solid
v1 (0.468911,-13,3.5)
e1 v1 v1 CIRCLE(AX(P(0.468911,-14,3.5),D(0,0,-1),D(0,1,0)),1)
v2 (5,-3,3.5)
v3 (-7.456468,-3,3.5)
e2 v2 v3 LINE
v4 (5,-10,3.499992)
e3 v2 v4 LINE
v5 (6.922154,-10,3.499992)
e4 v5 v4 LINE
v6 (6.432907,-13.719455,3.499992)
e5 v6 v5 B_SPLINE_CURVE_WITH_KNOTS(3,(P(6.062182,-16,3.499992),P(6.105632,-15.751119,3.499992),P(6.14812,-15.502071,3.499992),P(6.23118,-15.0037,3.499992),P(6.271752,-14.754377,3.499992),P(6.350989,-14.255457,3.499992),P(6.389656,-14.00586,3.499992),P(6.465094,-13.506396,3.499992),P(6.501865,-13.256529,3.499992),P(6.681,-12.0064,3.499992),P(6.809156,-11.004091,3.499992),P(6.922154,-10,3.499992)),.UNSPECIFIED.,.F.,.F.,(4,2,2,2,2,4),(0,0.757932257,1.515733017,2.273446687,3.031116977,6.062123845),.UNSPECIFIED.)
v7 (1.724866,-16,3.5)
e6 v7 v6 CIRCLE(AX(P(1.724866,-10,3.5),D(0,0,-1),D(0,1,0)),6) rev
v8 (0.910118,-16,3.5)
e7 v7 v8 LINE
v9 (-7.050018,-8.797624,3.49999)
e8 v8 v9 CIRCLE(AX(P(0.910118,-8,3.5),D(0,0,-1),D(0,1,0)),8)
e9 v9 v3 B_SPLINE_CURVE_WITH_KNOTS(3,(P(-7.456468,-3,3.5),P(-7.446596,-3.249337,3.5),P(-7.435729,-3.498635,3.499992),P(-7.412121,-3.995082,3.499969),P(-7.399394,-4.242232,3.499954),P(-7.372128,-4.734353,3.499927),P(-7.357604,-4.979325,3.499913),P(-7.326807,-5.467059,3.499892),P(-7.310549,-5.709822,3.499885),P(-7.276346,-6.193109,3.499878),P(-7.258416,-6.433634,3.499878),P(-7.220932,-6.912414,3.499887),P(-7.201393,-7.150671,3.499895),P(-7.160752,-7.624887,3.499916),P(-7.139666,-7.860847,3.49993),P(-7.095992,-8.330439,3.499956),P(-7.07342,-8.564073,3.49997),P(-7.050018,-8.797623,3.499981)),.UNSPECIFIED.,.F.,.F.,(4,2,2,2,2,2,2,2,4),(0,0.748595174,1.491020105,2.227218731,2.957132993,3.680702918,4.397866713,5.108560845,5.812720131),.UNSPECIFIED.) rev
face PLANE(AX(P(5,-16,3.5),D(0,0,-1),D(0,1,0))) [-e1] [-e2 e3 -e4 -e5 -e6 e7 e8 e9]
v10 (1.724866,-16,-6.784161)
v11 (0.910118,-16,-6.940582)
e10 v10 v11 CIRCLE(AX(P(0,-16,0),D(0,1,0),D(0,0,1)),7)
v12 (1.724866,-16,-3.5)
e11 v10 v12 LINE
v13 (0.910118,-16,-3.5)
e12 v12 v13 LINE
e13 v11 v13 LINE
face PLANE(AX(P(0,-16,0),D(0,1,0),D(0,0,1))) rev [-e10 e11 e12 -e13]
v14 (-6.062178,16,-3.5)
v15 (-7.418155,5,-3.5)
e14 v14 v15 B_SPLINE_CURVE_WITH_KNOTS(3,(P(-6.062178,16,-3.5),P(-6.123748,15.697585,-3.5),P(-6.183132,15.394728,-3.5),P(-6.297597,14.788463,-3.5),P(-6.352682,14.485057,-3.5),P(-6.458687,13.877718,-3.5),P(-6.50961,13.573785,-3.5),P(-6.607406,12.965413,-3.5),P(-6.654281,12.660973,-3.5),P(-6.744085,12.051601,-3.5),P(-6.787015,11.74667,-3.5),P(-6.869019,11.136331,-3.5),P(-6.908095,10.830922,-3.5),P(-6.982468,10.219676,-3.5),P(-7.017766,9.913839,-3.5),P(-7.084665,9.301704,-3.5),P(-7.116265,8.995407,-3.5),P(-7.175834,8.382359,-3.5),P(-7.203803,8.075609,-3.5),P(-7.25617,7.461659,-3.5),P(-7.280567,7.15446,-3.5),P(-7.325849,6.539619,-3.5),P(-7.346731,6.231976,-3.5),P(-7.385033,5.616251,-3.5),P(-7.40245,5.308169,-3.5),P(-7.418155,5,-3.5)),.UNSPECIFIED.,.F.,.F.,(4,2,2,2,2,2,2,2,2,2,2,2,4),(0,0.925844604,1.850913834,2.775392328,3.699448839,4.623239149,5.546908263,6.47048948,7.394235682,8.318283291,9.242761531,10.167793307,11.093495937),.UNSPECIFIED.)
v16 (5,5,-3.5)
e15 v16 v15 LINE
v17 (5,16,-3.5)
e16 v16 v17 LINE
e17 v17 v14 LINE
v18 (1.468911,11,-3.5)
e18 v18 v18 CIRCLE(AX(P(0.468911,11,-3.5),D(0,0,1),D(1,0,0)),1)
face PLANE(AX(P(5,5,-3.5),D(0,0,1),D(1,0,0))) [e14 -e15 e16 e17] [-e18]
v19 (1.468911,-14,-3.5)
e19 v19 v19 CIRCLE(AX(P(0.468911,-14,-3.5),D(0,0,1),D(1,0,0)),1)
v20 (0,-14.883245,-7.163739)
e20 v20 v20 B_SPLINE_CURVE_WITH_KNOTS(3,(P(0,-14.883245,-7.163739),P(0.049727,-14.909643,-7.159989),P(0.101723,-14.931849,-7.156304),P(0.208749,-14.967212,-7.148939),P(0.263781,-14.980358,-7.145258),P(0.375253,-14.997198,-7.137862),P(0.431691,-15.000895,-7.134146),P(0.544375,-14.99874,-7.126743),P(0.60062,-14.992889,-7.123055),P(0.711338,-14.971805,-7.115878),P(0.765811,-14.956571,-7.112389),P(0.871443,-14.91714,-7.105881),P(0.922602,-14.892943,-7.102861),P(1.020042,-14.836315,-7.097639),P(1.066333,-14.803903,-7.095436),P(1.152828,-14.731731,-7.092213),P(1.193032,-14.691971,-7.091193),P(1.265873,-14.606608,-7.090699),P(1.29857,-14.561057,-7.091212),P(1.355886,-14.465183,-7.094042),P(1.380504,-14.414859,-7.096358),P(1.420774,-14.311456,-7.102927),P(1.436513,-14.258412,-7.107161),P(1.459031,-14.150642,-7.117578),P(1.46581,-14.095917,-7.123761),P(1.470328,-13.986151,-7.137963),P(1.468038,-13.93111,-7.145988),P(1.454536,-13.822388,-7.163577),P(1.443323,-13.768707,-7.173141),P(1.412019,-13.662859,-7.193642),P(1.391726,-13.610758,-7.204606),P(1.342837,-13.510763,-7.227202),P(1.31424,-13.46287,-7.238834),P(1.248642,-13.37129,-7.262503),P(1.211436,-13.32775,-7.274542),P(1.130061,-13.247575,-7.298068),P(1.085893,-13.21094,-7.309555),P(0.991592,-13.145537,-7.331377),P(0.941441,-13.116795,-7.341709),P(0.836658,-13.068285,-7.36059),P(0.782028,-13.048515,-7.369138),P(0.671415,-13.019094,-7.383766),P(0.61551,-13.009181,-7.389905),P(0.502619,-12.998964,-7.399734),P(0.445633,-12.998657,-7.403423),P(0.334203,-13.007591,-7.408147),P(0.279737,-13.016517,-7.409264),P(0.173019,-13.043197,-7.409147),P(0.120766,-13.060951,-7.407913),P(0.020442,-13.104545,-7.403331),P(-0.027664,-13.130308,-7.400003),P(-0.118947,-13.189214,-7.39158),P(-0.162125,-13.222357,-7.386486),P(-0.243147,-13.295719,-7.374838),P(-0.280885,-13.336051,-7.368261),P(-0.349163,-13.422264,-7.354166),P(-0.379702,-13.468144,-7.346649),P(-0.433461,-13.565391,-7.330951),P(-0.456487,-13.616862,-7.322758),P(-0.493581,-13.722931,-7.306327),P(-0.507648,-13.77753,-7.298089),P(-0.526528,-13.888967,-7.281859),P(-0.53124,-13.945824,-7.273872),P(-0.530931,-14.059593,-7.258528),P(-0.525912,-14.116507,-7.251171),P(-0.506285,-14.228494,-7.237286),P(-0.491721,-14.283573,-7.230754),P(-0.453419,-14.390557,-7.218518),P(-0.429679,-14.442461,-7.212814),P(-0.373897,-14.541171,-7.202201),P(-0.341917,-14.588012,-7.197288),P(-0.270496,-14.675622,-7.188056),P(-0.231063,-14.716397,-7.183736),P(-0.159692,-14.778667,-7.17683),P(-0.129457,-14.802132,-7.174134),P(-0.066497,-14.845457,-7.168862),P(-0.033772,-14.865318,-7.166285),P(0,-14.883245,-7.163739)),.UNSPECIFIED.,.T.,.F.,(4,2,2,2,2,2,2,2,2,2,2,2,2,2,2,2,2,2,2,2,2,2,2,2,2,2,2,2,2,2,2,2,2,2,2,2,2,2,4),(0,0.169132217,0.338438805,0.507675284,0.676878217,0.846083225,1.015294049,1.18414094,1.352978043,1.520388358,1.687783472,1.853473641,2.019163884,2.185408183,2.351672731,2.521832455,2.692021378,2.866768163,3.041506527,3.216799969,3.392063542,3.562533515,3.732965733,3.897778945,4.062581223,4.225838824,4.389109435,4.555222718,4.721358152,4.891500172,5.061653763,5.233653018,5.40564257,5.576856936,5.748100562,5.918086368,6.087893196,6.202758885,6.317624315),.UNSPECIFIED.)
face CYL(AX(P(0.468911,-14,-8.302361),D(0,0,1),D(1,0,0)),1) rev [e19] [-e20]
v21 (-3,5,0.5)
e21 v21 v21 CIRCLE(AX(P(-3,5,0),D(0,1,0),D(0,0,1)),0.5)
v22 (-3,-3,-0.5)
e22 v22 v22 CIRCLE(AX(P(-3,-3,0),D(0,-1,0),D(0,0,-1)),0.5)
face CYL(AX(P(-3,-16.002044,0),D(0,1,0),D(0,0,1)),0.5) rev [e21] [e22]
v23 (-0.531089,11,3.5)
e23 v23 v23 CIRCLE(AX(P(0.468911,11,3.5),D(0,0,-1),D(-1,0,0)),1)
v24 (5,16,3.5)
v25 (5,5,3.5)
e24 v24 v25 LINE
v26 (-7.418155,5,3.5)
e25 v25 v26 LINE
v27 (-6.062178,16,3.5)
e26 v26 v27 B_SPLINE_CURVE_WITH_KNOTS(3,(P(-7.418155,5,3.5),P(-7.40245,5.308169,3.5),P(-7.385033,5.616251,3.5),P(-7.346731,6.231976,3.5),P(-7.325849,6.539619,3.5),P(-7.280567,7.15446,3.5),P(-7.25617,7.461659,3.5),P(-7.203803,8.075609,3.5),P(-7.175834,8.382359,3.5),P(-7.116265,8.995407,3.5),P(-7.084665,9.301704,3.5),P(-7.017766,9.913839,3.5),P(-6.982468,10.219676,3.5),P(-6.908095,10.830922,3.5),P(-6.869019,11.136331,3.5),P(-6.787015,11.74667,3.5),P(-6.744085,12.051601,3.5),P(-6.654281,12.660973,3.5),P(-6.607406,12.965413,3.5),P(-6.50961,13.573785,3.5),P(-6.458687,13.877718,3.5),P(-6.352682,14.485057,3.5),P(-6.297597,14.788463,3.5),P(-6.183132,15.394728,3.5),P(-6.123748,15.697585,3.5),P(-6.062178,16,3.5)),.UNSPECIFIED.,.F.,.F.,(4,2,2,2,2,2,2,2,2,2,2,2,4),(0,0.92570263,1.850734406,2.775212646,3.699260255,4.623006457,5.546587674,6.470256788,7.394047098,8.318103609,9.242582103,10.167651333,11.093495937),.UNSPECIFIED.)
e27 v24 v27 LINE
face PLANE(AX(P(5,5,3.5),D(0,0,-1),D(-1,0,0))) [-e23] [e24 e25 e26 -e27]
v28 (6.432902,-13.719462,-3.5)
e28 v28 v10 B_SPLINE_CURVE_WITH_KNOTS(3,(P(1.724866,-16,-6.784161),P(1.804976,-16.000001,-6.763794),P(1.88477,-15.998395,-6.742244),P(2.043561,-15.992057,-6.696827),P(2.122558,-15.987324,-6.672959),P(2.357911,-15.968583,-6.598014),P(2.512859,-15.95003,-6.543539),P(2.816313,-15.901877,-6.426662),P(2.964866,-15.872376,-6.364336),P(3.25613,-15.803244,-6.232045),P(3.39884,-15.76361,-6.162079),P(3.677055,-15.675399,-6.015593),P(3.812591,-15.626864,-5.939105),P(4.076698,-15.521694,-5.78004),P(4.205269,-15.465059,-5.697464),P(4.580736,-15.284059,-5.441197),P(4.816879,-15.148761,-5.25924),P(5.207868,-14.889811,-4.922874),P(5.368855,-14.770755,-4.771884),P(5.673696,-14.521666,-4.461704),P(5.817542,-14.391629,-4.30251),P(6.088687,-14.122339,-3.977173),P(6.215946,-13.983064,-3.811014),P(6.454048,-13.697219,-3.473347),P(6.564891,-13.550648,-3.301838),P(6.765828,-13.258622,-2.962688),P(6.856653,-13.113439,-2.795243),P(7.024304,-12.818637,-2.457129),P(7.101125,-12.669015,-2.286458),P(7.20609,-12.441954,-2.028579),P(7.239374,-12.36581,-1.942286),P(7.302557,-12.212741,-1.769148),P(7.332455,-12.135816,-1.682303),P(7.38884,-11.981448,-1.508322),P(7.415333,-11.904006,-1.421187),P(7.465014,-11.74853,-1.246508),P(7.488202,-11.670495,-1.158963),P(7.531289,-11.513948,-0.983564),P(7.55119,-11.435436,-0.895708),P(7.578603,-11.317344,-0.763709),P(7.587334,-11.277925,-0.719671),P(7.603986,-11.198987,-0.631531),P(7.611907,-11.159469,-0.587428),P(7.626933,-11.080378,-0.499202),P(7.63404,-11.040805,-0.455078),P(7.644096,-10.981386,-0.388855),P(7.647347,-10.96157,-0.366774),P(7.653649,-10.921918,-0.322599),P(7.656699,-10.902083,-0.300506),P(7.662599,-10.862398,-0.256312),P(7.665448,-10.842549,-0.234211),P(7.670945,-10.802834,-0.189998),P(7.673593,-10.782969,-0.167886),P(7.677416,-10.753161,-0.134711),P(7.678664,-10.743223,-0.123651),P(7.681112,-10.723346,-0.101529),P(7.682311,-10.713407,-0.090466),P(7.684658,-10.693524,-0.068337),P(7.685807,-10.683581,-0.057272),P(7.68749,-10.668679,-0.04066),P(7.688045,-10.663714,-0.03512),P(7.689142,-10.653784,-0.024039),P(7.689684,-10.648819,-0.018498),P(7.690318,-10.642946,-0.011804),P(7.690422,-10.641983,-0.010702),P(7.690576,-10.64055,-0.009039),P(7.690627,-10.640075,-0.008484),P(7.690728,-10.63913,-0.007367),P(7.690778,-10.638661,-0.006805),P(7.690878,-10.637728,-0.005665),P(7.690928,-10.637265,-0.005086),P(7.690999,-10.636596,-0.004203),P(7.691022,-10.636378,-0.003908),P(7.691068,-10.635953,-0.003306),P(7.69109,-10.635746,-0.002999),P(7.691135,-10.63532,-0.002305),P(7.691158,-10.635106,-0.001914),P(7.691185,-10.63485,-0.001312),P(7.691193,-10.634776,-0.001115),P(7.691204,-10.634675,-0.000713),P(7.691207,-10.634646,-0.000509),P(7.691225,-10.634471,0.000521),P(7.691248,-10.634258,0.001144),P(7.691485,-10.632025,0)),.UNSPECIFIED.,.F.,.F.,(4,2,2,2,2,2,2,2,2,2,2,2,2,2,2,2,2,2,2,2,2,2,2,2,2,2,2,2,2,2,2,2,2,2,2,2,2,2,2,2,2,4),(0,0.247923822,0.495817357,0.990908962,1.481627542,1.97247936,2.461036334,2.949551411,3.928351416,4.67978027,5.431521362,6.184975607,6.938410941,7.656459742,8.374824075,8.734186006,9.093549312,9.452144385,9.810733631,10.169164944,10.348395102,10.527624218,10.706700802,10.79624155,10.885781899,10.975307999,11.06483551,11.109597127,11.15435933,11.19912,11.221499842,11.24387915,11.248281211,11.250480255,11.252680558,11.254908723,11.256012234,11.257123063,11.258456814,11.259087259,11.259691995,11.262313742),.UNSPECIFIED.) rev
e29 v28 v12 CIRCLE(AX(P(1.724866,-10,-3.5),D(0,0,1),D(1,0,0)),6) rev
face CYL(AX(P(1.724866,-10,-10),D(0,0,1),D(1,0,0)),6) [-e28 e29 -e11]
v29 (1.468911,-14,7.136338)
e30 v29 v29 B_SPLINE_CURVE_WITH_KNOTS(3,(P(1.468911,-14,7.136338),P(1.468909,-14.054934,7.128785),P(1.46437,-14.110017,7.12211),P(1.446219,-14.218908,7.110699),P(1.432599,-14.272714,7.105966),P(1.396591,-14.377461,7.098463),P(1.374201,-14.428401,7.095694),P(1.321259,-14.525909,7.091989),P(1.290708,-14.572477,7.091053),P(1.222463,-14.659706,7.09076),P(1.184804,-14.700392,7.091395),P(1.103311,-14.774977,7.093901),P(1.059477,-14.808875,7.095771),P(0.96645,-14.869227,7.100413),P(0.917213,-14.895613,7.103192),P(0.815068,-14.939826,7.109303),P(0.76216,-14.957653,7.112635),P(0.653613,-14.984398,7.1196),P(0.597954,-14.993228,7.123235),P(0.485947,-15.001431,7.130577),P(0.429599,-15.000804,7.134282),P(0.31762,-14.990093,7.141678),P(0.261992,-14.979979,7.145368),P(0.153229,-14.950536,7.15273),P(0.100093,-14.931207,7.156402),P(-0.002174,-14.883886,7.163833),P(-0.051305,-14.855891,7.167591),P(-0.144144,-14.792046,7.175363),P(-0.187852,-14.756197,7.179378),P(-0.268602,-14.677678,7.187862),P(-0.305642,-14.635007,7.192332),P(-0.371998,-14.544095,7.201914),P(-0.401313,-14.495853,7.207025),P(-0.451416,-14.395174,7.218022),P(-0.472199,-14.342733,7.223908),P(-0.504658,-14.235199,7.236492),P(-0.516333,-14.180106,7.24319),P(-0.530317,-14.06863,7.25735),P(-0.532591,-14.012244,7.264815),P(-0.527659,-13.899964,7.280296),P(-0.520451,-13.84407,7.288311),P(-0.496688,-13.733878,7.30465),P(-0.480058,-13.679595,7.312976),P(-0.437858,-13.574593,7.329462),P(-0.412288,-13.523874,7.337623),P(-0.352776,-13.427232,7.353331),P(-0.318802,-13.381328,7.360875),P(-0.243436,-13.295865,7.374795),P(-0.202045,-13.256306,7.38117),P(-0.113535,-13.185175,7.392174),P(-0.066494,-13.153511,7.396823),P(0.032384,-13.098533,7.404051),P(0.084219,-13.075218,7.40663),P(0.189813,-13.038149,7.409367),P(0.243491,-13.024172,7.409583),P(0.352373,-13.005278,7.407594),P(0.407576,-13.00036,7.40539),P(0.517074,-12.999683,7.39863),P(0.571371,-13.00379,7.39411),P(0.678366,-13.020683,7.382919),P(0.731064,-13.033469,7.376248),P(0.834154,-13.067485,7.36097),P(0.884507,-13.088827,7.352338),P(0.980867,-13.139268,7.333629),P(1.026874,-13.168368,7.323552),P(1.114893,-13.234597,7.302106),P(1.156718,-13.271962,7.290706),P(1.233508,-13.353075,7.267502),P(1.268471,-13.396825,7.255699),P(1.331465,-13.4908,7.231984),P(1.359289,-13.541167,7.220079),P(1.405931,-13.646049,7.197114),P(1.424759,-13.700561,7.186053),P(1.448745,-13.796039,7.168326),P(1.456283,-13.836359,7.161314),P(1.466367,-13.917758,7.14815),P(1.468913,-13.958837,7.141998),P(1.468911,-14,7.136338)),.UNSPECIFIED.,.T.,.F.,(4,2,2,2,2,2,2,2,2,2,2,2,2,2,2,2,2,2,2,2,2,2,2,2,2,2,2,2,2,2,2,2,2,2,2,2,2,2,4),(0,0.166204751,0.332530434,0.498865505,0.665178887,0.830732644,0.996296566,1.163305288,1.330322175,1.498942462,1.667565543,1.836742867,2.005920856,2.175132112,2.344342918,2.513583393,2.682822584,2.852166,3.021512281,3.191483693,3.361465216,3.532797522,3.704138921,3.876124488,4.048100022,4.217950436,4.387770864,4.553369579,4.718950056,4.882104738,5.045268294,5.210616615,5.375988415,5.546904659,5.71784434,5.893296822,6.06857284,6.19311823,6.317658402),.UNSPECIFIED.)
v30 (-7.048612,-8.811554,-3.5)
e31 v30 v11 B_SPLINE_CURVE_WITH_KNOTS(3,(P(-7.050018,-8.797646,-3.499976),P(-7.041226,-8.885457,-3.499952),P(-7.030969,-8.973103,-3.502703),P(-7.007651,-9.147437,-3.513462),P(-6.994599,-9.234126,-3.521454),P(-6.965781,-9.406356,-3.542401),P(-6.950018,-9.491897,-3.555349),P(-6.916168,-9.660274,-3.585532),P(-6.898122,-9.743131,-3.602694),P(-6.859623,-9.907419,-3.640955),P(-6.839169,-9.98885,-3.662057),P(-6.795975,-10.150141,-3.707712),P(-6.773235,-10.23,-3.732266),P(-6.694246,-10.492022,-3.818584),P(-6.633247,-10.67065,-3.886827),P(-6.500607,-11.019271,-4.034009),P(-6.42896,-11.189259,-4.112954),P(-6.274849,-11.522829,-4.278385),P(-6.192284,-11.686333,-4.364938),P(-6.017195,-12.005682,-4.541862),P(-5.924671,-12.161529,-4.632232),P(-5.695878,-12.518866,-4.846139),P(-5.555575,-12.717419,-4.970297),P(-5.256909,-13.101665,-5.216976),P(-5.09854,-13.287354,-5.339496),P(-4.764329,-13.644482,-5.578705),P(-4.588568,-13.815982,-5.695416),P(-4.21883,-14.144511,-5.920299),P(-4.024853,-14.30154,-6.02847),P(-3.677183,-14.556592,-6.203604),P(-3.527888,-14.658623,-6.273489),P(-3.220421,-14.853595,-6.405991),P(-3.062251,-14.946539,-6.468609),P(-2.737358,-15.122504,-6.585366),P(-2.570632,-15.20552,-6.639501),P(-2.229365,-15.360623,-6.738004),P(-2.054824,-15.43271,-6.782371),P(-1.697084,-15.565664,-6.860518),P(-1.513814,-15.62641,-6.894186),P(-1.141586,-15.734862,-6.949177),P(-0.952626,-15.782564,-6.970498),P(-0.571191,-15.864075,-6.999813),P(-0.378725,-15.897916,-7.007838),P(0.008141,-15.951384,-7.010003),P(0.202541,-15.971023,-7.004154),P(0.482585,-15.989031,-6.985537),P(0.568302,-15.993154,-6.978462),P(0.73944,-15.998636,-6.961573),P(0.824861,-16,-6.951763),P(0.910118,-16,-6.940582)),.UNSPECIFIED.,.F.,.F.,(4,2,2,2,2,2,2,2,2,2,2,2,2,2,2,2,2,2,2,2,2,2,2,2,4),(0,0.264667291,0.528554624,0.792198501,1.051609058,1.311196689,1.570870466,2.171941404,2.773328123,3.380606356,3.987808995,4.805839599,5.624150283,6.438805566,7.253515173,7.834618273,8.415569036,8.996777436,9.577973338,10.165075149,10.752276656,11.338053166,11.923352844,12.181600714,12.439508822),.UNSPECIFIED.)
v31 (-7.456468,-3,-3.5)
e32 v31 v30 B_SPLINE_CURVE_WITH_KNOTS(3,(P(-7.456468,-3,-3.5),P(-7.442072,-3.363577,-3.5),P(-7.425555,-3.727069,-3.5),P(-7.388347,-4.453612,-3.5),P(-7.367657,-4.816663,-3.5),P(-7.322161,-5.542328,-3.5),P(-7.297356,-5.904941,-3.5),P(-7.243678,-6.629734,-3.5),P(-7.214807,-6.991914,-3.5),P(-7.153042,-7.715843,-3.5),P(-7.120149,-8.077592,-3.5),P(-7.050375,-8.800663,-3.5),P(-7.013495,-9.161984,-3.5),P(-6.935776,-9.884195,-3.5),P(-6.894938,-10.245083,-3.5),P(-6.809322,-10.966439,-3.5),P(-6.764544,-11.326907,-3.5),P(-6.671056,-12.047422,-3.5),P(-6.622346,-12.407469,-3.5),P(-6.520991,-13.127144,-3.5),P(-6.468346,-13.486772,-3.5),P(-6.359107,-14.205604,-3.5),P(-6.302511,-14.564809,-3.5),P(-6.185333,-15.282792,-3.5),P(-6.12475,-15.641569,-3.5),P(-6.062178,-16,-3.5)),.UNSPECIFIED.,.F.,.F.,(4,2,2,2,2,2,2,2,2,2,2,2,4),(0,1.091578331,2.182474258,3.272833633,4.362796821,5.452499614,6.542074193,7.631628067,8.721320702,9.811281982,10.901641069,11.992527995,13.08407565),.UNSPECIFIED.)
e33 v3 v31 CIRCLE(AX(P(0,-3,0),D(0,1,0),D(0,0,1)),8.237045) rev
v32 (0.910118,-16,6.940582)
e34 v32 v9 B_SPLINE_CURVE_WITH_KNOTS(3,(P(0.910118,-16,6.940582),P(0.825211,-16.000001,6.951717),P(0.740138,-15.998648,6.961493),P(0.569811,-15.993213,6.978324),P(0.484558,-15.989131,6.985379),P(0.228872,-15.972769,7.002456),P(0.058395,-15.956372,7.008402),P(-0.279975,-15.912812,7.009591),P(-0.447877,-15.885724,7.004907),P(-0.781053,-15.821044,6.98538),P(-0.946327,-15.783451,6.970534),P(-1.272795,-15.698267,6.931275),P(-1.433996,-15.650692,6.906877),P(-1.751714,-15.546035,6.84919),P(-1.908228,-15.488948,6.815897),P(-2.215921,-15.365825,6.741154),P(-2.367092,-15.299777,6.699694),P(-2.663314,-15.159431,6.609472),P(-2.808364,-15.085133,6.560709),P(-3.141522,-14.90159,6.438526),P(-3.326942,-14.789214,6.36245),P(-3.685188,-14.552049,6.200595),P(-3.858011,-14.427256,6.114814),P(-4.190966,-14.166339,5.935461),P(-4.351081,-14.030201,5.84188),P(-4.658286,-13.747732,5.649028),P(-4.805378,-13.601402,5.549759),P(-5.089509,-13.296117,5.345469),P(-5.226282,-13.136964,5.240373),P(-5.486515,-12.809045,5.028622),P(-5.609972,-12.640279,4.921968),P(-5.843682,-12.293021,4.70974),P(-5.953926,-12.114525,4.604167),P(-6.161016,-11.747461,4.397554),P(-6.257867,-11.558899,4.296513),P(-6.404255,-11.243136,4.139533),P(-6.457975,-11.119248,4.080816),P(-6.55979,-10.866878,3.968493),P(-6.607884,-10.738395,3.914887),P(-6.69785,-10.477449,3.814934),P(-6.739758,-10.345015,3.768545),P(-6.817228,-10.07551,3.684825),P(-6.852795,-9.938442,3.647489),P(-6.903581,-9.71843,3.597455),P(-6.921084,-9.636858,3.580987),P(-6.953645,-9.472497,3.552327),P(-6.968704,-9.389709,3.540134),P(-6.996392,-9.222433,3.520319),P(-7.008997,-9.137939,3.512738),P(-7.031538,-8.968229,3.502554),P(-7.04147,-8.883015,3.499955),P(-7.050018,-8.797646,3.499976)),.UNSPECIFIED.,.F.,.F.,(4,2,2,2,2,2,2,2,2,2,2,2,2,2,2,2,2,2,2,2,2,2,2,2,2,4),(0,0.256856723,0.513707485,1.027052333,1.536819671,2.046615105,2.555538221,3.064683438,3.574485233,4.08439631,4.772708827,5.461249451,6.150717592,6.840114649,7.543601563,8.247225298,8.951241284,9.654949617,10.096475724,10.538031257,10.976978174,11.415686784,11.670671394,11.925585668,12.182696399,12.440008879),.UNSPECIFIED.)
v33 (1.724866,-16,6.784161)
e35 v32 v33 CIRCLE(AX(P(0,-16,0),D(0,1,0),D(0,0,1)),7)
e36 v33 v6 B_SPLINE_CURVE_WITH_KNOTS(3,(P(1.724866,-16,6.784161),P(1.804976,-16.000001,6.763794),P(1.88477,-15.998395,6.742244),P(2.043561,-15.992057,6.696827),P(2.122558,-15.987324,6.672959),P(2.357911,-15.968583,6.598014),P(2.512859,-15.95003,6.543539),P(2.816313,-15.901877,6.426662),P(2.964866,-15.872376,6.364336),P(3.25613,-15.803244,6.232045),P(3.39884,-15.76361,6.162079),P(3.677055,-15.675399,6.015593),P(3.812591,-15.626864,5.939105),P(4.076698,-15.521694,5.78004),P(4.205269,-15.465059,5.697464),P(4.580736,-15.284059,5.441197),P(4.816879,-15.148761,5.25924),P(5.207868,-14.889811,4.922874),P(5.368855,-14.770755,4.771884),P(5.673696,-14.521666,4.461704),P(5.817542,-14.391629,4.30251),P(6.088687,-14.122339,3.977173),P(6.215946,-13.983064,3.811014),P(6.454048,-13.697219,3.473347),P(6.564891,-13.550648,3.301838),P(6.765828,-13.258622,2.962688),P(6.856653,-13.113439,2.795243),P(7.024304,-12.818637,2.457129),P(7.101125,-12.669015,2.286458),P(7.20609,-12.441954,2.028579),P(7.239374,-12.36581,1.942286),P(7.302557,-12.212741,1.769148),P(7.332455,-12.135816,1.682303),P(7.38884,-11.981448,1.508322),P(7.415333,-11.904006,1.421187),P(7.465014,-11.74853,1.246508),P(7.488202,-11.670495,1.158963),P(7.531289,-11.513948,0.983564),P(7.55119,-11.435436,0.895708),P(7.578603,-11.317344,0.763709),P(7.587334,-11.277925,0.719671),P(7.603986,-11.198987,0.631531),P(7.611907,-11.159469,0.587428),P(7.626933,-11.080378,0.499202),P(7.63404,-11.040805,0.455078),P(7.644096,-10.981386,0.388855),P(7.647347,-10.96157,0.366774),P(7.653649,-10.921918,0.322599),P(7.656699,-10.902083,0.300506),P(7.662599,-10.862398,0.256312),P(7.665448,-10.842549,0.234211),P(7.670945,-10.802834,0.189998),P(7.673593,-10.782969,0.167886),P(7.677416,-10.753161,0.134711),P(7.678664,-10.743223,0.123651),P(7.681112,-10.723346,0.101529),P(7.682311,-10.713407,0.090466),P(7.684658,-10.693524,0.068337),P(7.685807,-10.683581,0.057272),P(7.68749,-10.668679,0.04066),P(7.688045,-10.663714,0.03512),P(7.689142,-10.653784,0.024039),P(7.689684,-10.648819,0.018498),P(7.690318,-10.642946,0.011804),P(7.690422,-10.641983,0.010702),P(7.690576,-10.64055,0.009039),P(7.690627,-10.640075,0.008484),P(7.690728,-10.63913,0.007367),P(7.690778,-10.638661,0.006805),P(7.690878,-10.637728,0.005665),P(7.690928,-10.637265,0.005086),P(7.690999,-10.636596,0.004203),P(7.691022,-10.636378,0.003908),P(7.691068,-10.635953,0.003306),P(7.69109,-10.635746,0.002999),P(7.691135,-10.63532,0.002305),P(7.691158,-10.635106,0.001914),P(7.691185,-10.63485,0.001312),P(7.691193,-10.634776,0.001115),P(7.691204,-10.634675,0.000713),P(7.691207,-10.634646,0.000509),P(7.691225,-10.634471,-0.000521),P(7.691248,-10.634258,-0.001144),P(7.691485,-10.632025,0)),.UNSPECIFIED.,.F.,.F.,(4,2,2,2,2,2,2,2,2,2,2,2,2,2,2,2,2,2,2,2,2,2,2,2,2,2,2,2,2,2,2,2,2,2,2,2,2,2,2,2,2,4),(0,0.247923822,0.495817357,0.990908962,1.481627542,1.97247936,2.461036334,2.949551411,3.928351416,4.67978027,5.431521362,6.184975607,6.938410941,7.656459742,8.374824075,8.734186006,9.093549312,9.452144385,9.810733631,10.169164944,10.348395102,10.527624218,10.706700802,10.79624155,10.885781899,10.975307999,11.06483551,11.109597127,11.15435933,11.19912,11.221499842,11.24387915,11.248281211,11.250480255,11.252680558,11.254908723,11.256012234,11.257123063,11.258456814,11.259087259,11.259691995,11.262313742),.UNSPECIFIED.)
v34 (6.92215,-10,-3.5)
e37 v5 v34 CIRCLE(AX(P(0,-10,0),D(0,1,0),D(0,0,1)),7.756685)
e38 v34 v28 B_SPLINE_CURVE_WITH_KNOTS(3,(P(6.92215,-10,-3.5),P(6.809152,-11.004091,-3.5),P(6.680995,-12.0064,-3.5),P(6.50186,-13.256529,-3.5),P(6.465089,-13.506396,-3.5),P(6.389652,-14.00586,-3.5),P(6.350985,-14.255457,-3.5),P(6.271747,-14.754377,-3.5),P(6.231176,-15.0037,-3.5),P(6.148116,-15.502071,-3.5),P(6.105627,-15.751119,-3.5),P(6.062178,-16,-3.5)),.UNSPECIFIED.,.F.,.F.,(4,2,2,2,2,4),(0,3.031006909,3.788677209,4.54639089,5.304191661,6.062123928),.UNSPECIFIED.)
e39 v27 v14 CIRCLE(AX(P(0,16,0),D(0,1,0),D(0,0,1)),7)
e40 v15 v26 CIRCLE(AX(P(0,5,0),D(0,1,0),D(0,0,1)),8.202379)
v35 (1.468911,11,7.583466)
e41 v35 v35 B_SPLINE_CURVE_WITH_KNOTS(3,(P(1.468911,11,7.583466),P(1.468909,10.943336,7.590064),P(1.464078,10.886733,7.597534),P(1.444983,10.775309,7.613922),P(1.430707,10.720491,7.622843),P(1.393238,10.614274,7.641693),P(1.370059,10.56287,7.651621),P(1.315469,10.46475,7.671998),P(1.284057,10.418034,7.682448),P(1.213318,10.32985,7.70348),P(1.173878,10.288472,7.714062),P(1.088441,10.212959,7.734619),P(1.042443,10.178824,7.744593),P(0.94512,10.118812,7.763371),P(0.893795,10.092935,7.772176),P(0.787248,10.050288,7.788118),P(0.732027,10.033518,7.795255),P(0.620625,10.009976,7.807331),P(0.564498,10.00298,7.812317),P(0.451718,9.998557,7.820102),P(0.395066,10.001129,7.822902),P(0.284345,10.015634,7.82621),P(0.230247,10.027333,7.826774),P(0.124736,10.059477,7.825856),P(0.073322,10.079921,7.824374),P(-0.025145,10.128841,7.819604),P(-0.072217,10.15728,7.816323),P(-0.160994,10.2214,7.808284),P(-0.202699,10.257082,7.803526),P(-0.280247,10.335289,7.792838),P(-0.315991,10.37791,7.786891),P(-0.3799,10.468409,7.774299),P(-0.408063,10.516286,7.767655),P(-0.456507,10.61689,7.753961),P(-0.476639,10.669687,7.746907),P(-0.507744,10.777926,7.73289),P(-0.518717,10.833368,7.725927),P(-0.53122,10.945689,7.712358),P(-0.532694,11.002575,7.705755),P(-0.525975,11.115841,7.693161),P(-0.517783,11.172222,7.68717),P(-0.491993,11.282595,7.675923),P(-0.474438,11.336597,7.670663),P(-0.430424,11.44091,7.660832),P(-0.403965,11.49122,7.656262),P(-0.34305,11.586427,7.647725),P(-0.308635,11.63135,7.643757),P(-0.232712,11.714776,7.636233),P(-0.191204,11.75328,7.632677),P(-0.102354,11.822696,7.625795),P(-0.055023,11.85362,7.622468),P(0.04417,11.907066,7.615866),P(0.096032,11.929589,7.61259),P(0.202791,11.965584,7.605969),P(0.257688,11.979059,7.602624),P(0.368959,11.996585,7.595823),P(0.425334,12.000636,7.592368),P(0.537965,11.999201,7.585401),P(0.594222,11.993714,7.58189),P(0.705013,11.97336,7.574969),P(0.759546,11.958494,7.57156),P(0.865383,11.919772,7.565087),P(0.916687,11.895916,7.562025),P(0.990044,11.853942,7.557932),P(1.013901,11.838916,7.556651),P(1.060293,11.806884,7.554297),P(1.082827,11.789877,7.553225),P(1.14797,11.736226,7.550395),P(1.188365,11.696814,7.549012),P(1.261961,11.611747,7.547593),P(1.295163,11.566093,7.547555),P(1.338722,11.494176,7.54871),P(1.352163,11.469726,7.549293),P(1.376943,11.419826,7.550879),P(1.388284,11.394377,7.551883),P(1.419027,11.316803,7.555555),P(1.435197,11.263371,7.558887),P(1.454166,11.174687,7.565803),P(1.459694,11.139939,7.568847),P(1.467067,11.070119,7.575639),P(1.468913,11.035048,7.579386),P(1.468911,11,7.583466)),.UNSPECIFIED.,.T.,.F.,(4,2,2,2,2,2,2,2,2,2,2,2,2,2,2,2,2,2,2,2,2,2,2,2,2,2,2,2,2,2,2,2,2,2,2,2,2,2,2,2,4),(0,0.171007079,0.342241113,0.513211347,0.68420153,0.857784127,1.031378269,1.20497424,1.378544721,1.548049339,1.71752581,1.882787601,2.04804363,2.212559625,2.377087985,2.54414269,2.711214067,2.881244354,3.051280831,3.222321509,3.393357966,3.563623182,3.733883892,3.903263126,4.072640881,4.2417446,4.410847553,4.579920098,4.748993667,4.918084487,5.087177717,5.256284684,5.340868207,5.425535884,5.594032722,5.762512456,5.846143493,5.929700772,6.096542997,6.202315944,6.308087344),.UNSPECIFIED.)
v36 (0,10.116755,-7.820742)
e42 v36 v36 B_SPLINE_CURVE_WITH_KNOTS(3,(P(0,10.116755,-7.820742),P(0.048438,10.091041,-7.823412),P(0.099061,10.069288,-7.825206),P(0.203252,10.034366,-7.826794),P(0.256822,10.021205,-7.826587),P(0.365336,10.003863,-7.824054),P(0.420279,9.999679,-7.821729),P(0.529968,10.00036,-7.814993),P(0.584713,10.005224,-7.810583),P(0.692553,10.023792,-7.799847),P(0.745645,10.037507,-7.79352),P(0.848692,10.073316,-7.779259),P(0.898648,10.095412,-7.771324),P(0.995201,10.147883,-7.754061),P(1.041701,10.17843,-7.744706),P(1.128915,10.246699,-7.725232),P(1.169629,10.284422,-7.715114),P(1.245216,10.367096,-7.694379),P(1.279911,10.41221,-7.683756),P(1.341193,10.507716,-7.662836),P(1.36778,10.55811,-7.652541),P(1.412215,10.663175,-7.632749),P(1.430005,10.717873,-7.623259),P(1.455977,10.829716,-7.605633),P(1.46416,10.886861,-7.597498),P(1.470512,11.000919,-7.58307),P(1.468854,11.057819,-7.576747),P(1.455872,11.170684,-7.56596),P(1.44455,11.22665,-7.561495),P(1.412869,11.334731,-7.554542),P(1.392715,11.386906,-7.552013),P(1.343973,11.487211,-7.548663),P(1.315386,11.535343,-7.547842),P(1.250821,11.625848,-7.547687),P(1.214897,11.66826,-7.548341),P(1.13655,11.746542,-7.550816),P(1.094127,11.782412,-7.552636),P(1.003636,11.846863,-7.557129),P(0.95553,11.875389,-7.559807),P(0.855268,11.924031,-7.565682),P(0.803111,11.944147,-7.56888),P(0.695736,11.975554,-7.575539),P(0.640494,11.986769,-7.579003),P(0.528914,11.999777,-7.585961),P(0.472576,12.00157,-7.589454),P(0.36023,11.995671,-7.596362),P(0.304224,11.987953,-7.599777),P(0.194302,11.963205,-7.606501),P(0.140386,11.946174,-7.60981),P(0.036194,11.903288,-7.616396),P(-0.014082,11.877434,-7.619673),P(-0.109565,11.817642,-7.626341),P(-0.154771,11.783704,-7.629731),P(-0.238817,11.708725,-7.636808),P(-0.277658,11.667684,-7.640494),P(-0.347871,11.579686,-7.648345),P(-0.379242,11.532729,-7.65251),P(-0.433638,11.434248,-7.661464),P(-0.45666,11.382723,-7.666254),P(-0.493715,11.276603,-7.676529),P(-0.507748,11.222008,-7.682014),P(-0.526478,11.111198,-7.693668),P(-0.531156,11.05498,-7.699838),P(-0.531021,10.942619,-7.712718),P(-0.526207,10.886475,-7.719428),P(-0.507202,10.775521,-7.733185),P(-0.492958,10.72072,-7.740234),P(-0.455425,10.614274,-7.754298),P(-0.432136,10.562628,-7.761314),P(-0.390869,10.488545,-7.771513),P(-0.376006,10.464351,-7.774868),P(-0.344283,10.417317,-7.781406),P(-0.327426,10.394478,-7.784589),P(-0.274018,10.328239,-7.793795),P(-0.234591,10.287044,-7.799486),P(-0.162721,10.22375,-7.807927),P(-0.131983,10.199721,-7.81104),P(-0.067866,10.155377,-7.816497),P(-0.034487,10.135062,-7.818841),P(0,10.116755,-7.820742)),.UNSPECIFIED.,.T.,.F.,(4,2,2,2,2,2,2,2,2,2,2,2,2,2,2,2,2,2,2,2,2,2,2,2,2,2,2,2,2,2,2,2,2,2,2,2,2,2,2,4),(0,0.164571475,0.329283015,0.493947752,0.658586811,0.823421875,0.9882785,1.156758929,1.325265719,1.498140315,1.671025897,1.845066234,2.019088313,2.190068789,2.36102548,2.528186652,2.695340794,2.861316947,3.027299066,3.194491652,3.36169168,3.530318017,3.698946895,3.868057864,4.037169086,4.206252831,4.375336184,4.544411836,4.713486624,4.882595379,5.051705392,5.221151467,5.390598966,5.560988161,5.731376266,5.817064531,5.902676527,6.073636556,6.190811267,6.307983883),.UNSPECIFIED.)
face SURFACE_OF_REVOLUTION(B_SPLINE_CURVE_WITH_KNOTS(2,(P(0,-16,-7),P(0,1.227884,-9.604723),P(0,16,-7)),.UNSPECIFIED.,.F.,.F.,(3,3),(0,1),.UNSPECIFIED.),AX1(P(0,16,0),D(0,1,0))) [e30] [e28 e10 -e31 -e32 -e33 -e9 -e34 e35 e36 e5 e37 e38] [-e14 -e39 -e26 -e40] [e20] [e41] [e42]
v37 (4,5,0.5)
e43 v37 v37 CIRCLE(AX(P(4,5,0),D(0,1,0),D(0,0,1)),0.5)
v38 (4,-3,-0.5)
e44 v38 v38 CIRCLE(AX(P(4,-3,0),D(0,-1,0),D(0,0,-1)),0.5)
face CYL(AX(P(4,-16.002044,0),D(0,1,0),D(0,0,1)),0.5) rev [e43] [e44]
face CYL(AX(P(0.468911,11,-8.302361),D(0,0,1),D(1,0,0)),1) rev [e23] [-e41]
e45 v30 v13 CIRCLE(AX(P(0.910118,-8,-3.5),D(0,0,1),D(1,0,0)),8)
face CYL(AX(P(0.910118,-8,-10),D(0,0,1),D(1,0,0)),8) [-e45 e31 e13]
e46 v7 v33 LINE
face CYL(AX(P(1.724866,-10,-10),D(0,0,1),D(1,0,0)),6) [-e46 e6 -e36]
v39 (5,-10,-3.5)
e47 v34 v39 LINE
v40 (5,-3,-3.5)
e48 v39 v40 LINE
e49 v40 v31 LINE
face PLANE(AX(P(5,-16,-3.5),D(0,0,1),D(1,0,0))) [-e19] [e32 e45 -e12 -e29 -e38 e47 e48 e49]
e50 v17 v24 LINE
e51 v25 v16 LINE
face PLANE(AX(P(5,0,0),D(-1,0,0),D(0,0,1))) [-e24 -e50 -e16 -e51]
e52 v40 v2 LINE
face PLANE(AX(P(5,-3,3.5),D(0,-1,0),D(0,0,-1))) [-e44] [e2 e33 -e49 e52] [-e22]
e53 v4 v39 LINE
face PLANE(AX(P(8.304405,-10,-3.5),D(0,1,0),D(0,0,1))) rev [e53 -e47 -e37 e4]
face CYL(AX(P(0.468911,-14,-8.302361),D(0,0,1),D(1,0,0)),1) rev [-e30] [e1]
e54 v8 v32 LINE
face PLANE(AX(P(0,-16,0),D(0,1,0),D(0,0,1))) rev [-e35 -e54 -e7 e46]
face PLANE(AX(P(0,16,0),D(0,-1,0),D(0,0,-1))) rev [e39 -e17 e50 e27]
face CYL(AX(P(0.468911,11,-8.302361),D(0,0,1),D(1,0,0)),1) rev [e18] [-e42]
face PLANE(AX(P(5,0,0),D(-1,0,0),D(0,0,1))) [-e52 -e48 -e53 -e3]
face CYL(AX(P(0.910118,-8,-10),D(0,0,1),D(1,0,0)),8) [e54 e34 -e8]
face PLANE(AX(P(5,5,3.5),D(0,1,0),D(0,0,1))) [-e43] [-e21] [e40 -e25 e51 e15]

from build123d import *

# Parameters (mm, degrees)
CUT_EXTRUDE1_DEPTH      = 5
CUT_EXTRUDE1_DEPTH_BACK = 20.845866419
SKETCH2_W               = 7
SKETCH2_H               = 11
SKETCH2_H_2             = 13
CUT_EXTRUDE2_DEPTH      = 20.845866419
CUT_EXTRUDE2_DEPTH_BACK = 20.845866419
SKETCH3_R               = 1
CUT_EXTRUDE4_START      = 10
CUT_EXTRUDE4_DEPTH      = 20
SKETCH6_R               = 0.5
CUT_EXTRUDE5_DEPTH      = 25.059476613
SKETCH7_W               = 6.999992022
SKETCH7_H               = 6
CUT_EXTRUDE6_DEPTH      = 23.402723679


with BuildPart() as part:
    # Sketch1 → Revolve1 (revolve)
    with BuildSketch(Plane(origin=(0, 0, 0), x_dir=(0, 0, -1), z_dir=(1, 0, 0))):
        with BuildLine():
            Line((0, 16), (0, -16))
            Line((0, -16), (7, -16))
            add(Edge.make_bspline(
                [(7, 16), (9.604722665, 1.227883705), (7, -16)],
                knots=[0, 0, 0, 1, 1, 1], degree=2))
            Line((7, 16), (0, 16))
        make_face()
    revolve(axis=Axis((0, 16, 0), (0, -1, 0)))

    # Sketch2 → Cut-Extrude1 (cut, two sides: drawn at the far end of the back side and taken through both)
    with BuildSketch(Plane(origin=(0, 0, 0), x_dir=(0, 0, -1), z_dir=(1, 0, 0)).offset(-CUT_EXTRUDE1_DEPTH_BACK)):
        with Locations((0, 10.5)):
            Rectangle(SKETCH2_W, SKETCH2_H)
        with Locations((0, -9.5)):
            Rectangle(SKETCH2_W, SKETCH2_H_2)
    extrude(amount=CUT_EXTRUDE1_DEPTH + CUT_EXTRUDE1_DEPTH_BACK, mode=Mode.SUBTRACT)

    # Sketch3 → Cut-Extrude2 (cut, two sides: drawn at the far end of the back side and taken through both)
    with BuildSketch(Plane.XY.offset(-CUT_EXTRUDE2_DEPTH_BACK)):
        with Locations((0.468911087, 11)):
            Circle(SKETCH3_R)
        with Locations((0.468911087, -14)):
            Circle(SKETCH3_R)
    extrude(amount=CUT_EXTRUDE2_DEPTH + CUT_EXTRUDE2_DEPTH_BACK, mode=Mode.SUBTRACT)

    # Sketch5 → Cut-Extrude4 (cut)
    with BuildSketch(Plane.XY.offset(CUT_EXTRUDE4_START)):
        with BuildLine():
            Line((-6.062177826, -16), (0.910117982, -16))
            ThreePointArc((0.910117982, -16), (-4.45732236, -13.932165218), (-7.050017744, -8.797646043))
            add(Edge.make_bspline(
                [(-6.062177826, -16), (-6.437757064, -13.848691714), (-6.741485315, -11.68967719), (-7.000647249, -9.281372163), (-7.025777059, -9.039556784), (-7.050017744, -8.797646043)],
                knots=[0, 0, 0, 0, 0.5, 0.5, 0.555783836, 0.555783836, 0.555783836, 0.555783836], degree=3))
        make_face()
        with BuildLine():
            add(Edge.make_bspline(
                [(7, -16), (7.013595799, -15.909695487), (7.040767758, -15.729216903), (7.080753669, -15.458583276), (7.146297525, -15.008691454), (7.29056419, -13.986943062), (7.487309278, -12.468895785), (7.629352159, -11.218602021), (7.691486496, -10.632009884)],
                knots=[0, 0, 0, 0, 0.008523827, 0.017035341, 0.025534583, 0.05095908, 0.113348633, 0.168406234, 0.168406234, 0.168406234, 0.168406234], degree=3))
            ThreePointArc((7.691486496, -10.632009884), (5.737840967, -14.46049657), (1.724865718, -16))
            Line((1.724865718, -16), (7, -16))
        make_face()
    extrude(amount=-CUT_EXTRUDE4_DEPTH, mode=Mode.SUBTRACT)


with BuildPart() as cut_extrude4_kept_piece:
    # of the separate pieces the step leaves, the one the design keeps (cut_extrude4_pieces_kept)
    add(part.part.solids().sort_by_distance((0.910117982, -16, -6.940582487))[0])

    # Sketch6 → Cut-Extrude5 (cut, through all)
    with BuildSketch(Plane(origin=(0, 5, 0), x_dir=(1, 0, 0), z_dir=(0, 1, 0))):
        with Locations((4, 0)):
            Circle(SKETCH6_R)
        with Locations((-3, 0)):
            Circle(SKETCH6_R)
    extrude(amount=-CUT_EXTRUDE5_DEPTH, mode=Mode.SUBTRACT)

    # Sketch7 → Cut-Extrude6 (cut, through all)
    with BuildSketch(Plane.ZY.offset(-5)):
        with Locations((-3.989e-06, -13)):
            Rectangle(SKETCH7_W, SKETCH7_H)
    extrude(amount=-CUT_EXTRUDE6_DEPTH, mode=Mode.SUBTRACT)


solid = cut_extrude4_kept_piece.part
